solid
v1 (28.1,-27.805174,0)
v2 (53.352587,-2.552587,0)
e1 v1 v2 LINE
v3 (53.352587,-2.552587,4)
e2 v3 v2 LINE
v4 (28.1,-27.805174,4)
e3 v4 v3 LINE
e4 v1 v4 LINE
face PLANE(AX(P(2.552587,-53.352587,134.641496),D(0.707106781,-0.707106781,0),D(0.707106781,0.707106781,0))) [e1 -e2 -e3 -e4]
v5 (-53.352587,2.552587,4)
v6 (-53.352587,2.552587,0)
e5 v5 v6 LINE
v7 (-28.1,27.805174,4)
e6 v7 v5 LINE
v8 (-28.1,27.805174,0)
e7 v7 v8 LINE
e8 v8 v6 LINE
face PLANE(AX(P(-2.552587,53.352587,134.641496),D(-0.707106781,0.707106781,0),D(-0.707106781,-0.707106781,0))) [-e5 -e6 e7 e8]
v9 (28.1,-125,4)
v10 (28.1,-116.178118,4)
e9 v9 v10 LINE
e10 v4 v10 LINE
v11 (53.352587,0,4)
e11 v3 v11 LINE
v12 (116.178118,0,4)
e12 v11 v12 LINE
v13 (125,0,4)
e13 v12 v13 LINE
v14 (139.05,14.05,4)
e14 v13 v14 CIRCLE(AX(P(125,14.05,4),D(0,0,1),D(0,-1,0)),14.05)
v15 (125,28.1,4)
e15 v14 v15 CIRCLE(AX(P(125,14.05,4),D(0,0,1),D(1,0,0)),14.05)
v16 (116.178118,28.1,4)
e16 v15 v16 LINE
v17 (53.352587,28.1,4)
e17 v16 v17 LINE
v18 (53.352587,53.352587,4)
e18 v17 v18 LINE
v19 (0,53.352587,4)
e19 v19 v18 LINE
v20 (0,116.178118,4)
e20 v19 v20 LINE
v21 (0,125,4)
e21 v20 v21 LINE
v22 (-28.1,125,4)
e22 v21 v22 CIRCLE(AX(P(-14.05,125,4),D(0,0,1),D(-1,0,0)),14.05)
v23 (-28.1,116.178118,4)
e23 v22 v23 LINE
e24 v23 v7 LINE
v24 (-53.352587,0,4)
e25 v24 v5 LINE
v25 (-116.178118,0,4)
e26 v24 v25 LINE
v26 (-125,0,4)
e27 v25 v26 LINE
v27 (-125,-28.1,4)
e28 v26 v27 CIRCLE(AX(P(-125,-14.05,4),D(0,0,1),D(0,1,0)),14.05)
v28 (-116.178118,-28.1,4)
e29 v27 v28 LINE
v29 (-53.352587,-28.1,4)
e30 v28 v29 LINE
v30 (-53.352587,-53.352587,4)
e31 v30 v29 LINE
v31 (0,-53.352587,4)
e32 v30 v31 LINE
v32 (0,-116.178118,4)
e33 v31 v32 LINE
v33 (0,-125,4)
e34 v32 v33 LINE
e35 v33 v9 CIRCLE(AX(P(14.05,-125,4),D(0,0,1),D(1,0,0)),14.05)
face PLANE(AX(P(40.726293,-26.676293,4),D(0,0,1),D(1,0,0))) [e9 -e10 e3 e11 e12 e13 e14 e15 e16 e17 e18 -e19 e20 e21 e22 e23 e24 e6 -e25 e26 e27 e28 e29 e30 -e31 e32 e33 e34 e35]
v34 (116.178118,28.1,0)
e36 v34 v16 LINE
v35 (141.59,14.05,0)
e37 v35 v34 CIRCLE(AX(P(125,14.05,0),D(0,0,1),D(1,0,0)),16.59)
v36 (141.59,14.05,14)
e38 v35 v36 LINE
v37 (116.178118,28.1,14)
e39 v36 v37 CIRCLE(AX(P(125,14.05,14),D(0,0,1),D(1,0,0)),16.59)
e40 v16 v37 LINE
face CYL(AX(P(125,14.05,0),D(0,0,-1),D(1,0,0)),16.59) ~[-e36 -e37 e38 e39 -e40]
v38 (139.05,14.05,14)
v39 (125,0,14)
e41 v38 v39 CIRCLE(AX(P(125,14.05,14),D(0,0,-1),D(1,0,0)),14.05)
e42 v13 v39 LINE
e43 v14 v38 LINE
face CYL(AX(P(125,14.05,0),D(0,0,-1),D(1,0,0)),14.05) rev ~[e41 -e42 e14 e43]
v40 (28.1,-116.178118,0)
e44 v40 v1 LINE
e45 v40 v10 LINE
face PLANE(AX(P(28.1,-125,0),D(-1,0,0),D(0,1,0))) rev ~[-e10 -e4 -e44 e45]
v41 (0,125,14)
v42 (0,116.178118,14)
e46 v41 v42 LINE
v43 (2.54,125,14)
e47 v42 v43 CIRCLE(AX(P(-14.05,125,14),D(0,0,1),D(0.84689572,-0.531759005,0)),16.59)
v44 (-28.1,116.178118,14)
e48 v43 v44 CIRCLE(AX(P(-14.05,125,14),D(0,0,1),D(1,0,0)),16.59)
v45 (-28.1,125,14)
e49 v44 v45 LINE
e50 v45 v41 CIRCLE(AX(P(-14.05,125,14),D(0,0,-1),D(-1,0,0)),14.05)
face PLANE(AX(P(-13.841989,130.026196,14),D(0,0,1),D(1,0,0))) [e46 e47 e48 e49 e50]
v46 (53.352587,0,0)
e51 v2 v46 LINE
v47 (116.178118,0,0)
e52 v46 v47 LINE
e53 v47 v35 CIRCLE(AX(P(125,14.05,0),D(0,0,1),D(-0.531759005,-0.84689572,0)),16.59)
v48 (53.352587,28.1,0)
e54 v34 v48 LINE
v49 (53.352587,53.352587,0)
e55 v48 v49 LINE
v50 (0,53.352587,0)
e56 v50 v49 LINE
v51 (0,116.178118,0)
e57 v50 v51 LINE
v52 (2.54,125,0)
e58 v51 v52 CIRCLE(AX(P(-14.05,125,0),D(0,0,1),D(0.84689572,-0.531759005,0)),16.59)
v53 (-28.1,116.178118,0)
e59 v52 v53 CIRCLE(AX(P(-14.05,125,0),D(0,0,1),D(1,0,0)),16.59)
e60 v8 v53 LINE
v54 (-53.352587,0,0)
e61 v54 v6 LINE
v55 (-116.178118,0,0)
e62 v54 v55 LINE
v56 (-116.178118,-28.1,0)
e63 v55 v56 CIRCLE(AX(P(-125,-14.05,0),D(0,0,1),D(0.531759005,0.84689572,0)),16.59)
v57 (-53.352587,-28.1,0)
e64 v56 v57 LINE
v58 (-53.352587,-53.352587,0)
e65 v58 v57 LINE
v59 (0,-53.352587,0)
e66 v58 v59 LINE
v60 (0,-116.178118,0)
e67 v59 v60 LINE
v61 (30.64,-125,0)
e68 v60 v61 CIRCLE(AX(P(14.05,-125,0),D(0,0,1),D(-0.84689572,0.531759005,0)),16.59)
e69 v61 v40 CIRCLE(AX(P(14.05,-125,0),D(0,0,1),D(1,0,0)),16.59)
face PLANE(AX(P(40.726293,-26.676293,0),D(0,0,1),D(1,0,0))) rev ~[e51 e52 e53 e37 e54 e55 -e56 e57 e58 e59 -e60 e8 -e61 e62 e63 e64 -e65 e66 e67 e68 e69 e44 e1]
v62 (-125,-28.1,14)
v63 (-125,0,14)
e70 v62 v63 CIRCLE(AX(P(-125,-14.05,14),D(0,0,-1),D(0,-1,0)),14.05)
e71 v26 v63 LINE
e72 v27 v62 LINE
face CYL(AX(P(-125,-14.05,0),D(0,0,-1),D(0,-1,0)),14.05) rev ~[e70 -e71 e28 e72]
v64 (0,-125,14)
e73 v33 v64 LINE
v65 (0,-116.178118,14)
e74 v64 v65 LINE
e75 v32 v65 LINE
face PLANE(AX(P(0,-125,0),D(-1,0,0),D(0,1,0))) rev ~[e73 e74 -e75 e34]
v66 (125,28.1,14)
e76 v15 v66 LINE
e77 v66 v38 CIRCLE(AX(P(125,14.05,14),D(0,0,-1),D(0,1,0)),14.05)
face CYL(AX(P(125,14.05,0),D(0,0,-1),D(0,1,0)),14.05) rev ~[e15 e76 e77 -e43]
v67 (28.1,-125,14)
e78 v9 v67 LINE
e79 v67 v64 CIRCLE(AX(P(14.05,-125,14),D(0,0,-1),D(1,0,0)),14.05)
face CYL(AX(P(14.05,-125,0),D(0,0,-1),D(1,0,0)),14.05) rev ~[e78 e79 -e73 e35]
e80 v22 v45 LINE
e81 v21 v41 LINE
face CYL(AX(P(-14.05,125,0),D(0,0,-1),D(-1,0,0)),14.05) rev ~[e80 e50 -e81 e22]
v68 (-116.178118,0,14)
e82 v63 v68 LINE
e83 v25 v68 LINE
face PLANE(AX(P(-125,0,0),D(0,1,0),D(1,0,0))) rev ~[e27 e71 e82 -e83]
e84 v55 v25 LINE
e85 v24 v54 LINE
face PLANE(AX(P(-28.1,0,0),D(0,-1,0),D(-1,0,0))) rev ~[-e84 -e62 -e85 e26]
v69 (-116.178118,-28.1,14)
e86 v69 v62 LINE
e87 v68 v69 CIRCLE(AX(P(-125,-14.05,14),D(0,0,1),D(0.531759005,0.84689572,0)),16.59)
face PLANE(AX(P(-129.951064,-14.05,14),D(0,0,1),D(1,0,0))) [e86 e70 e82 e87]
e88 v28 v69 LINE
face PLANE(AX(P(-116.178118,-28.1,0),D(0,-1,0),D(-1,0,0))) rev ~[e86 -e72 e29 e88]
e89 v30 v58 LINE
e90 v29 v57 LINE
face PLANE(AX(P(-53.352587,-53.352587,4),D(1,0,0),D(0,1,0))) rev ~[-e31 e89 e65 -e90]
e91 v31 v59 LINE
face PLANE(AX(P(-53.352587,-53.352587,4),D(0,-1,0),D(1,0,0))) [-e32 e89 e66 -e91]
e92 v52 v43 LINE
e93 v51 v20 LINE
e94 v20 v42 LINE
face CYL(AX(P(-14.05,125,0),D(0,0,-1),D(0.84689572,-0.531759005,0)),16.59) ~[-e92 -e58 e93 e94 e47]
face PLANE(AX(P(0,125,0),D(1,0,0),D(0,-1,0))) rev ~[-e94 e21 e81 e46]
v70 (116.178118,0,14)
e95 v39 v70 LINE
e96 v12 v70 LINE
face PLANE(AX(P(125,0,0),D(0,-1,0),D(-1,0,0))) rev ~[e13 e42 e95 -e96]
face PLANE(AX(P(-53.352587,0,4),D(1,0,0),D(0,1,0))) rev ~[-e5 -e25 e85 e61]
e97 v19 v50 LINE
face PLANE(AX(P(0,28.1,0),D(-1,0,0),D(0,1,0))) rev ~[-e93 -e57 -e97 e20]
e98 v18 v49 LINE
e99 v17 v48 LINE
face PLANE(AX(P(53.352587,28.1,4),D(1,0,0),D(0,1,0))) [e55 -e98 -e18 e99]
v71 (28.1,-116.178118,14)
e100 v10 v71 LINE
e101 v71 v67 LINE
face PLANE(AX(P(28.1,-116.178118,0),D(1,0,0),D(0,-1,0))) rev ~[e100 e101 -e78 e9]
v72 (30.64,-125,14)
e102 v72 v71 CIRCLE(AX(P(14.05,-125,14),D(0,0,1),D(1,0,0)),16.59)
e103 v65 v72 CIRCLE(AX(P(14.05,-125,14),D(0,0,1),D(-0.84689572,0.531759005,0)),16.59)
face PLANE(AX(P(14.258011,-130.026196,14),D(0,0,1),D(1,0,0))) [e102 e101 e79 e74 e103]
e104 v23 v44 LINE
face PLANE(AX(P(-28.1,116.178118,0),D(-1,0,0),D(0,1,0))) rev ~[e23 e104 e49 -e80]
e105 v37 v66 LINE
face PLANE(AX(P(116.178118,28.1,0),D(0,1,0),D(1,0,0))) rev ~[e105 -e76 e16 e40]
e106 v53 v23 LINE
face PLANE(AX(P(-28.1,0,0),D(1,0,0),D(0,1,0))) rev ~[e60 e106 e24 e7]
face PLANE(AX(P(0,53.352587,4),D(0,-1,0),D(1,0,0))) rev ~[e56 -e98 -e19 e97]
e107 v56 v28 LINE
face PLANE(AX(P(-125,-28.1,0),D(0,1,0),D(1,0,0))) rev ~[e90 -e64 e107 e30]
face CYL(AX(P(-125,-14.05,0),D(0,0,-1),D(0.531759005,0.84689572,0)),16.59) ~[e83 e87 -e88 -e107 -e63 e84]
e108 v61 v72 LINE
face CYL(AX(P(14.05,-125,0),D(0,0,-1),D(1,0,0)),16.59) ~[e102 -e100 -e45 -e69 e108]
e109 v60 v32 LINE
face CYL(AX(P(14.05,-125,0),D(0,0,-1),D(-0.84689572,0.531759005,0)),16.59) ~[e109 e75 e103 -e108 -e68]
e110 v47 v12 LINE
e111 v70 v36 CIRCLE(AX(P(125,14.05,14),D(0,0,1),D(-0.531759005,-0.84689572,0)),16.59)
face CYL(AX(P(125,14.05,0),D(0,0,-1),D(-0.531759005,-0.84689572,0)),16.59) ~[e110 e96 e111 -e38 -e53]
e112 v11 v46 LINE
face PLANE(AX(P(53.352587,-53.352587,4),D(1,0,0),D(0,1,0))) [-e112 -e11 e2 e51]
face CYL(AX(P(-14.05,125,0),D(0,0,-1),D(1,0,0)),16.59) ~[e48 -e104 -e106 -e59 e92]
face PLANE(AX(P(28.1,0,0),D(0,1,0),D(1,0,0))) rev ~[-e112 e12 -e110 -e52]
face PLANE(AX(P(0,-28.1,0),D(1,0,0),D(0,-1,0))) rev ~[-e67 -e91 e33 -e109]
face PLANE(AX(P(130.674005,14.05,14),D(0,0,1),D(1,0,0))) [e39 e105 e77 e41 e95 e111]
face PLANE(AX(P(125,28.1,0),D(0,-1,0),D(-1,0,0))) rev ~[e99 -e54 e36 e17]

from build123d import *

# Parameters (mm, degrees)
F1_DEPTH    = 4
F2_DEPTH    = 14
F3_W        = 53.352586925
F3_H        = 25.252586925
F4_DEPTH    = 4
F3_W_2      = 25.252586925
F3_H_2      = 53.352586925
F5_DEPTH    = 4
F6_T4_DEPTH = 265.2829915773
F6_T9_DEPTH = 265.2829915773


# Not quite as in the source:
# - a fillet or chamfer that OpenCascade refuses, or shapes differently, is made with other operations: its cross-section is extruded or revolved along the edge and cut away or added


with BuildPart() as f1:
    # F0 (on Top) → F1 (new body)
    with BuildSketch(Plane.XY):
        with BuildLine():
            ThreePointArc((0, 125), (-14.05, 139.05), (-28.1, 125))
            Line((-28.1, 125), (0, 125))
        make_face()
        with BuildLine():
            Line((0, 125), (-28.1, 125))
            ThreePointArc((-28.1, 125), (-14.05, 110.95), (0, 125))
        make_face()
        with BuildLine():
            Line((-28.1, 125), (-28.1, 116.1781181146))
            ThreePointArc((-28.1, 116.1781181146), (-14.05, 108.41), (0, 116.1781181146))
            Line((0, 116.1781181146), (0, 125))
            ThreePointArc((0, 125), (-14.05, 110.95), (-28.1, 125))
        make_face()
        with BuildLine():
            Line((-28.1, 0), (0, 0))
            Line((0, 0), (0, 28.1))
            Line((0, 28.1), (0, 116.1781181146))
            ThreePointArc((0, 116.1781181146), (-14.05, 108.41), (-28.1, 116.1781181146))
            Line((-28.1, 116.1781181146), (-28.1, 0))
        make_face()
        with BuildLine():
            Line((0, 28.1), (0, 0))
            Line((0, 0), (28.1, 0))
            Line((28.1, 0), (116.1781181146, 0))
            ThreePointArc((116.1781181146, 0), (108.41, 14.05), (116.1781181146, 28.1))
            Line((116.1781181146, 28.1), (0, 28.1))
        make_face()
        with BuildLine():
            ThreePointArc((139.05, 14.05), (134.9348502757, 23.9848502757), (125, 28.1))
            Line((125, 28.1), (125, 0))
            ThreePointArc((125, 0), (134.9348502757, 4.1151497243), (139.05, 14.05))
        make_face()
        with BuildLine():
            Line((125, 0), (125, 28.1))
            ThreePointArc((125, 28.1), (110.95, 14.05), (125, 0))
        make_face()
        with BuildLine():
            Line((28.1, 0), (0, 0))
            Line((0, 0), (0, -28.1))
            Line((0, -28.1), (0, -116.1781181146))
            ThreePointArc((0, -116.1781181146), (14.05, -108.41), (28.1, -116.1781181146))
            Line((28.1, -116.1781181146), (28.1, 0))
        make_face()
        with BuildLine():
            Line((28.1, -125), (0, -125))
            ThreePointArc((0, -125), (14.05, -139.05), (28.1, -125))
        make_face()
        with BuildLine():
            ThreePointArc((28.1, -125), (14.05, -110.95), (0, -125))
            Line((0, -125), (28.1, -125))
        make_face()
        with BuildLine():
            ThreePointArc((28.1, -116.1781181146), (14.05, -108.41), (0, -116.1781181146))
            Line((0, -116.1781181146), (0, -125))
            ThreePointArc((0, -125), (14.05, -110.95), (28.1, -125))
            Line((28.1, -125), (28.1, -116.1781181146))
        make_face()
        with BuildLine():
            Line((-125, -28.1), (-125, 0))
            ThreePointArc((-125, 0), (-139.05, -14.05), (-125, -28.1))
        make_face()
        with BuildLine():
            ThreePointArc((-110.95, -14.05), (-115.0651497243, -4.1151497243), (-125, 0))
            Line((-125, 0), (-125, -28.1))
            ThreePointArc((-125, -28.1), (-115.0651497243, -23.9848502757), (-110.95, -14.05))
        make_face()
        with BuildLine():
            ThreePointArc((-108.41, -14.05), (-110.4813375189, -6.0227626321), (-116.1781181146, 0))
            Line((-116.1781181146, 0), (-125, 0))
            ThreePointArc((-125, 0), (-115.0651497243, -4.1151497243), (-110.95, -14.05))
            ThreePointArc((-110.95, -14.05), (-115.0651497243, -23.9848502757), (-125, -28.1))
            Line((-125, -28.1), (-116.1781181146, -28.1))
            ThreePointArc((-116.1781181146, -28.1), (-110.4813375189, -22.0772373679), (-108.41, -14.05))
        make_face()
        with BuildLine():
            Line((0, -28.1), (0, 0))
            Line((0, 0), (-28.1, 0))
            Line((-28.1, 0), (-116.1781181146, 0))
            ThreePointArc((-116.1781181146, 0), (-110.4813375189, -6.0227626321), (-108.41, -14.05))
            ThreePointArc((-108.41, -14.05), (-110.4813375189, -22.0772373679), (-116.1781181146, -28.1))
            Line((-116.1781181146, -28.1), (0, -28.1))
        make_face()
        with BuildLine():
            Line((125, 28.1), (116.1781181146, 28.1))
            ThreePointArc((116.1781181146, 28.1), (108.41, 14.05), (116.1781181146, 0))
            Line((116.1781181146, 0), (125, 0))
            ThreePointArc((125, 0), (110.95, 14.05), (125, 28.1))
        make_face()
    extrude(amount=F1_DEPTH)

    # F0 (on Top) → F2 (join)
    with BuildSketch(Plane.XY):
        with BuildLine():
            ThreePointArc((2.54, 125), (-18.6401307171, 140.9423586712), (-28.1, 116.1781181146))
            Line((-28.1, 116.1781181146), (-28.1, 125))
            ThreePointArc((-28.1, 125), (-14.05, 139.05), (0, 125))
            Line((0, 125), (0, 116.1781181146))
            ThreePointArc((0, 116.1781181146), (1.8923586712, 120.4098692829), (2.54, 125))
        make_face()
        with BuildLine():
            ThreePointArc((141.59, 14.05), (133.0272373679, 28.5686624811), (116.1781181146, 28.1))
            Line((116.1781181146, 28.1), (125, 28.1))
            ThreePointArc((125, 28.1), (134.9348502757, 23.9848502757), (139.05, 14.05))
            ThreePointArc((139.05, 14.05), (134.9348502757, 4.1151497243), (125, 0))
            Line((125, 0), (116.1781181146, 0))
            ThreePointArc((116.1781181146, 0), (133.0272373679, -0.4686624811), (141.59, 14.05))
        make_face()
        with BuildLine():
            Line((0, -125), (0, -116.1781181146))
            ThreePointArc((0, -116.1781181146), (9.4598692829, -140.9423586712), (30.64, -125))
            ThreePointArc((30.64, -125), (29.9923586712, -120.4098692829), (28.1, -116.1781181146))
            Line((28.1, -116.1781181146), (28.1, -125))
            ThreePointArc((28.1, -125), (14.05, -139.05), (0, -125))
        make_face()
        with BuildLine():
            Line((-125, 0), (-116.1781181146, 0))
            ThreePointArc((-116.1781181146, 0), (-141.59, -14.05), (-116.1781181146, -28.1))
            Line((-116.1781181146, -28.1), (-125, -28.1))
            ThreePointArc((-125, -28.1), (-139.05, -14.05), (-125, 0))
        make_face()
    extrude(amount=F2_DEPTH)

    # F3 (on face) → F4 (join)
    with BuildSketch(Plane.XY.offset(4)):
        with Locations((26.6762934625, 40.7262934625)):
            Rectangle(F3_W, F3_H)
    extrude(amount=-F4_DEPTH)

    # F3 (on face) → F5 (join)
    with BuildSketch(Plane.XY.offset(4)):
        with Locations((40.7262934625, -26.6762934625)):
            Rectangle(F3_W_2, F3_H_2)
        with Locations((-26.6762934625, -40.7262934625)):
            Rectangle(F3_W, F3_H)
        with Locations((-40.7262934625, 26.6762934625)):
            Rectangle(F3_W_2, F3_H_2)
    extrude(amount=-F5_DEPTH)

    # F6: chamfer of 50.8 on 2 edges, made by hand


with BuildPart() as f6_tool2:
    # F6_s3 → F6_t4 (new body)
    with BuildSketch(Plane.XY.offset(134.6414957887)):
        Polygon((2.552586925, -53.352586925), (53.352586925, -2.552586925), (53.352586925, -53.352586925), align=None)
    extrude(amount=-F6_T4_DEPTH)

    split(bisect_by=Plane.YZ.offset(28.1), keep=Keep.TOP)


with BuildPart() as f1_1:
    add(f1.part)

    # F6_t1: cut F6_tool2
    add(f6_tool2.part, mode=Mode.SUBTRACT)


with BuildPart() as f6_tool7:
    # F6_s8 → F6_t9 (new body)
    with BuildSketch(Plane.XY.offset(134.6414957887)):
        Polygon((-2.552586925, 53.352586925), (-53.352586925, 2.552586925), (-53.352586925, 53.352586925), align=None)
    extrude(amount=-F6_T9_DEPTH)

    split(bisect_by=Plane.YZ.offset(-28.1), keep=Keep.BOTTOM)


with BuildPart() as f1_2:
    add(f1_1.part)

    # F6_t6: cut F6_tool7
    add(f6_tool7.part, mode=Mode.SUBTRACT)


solid = f1_2.part
